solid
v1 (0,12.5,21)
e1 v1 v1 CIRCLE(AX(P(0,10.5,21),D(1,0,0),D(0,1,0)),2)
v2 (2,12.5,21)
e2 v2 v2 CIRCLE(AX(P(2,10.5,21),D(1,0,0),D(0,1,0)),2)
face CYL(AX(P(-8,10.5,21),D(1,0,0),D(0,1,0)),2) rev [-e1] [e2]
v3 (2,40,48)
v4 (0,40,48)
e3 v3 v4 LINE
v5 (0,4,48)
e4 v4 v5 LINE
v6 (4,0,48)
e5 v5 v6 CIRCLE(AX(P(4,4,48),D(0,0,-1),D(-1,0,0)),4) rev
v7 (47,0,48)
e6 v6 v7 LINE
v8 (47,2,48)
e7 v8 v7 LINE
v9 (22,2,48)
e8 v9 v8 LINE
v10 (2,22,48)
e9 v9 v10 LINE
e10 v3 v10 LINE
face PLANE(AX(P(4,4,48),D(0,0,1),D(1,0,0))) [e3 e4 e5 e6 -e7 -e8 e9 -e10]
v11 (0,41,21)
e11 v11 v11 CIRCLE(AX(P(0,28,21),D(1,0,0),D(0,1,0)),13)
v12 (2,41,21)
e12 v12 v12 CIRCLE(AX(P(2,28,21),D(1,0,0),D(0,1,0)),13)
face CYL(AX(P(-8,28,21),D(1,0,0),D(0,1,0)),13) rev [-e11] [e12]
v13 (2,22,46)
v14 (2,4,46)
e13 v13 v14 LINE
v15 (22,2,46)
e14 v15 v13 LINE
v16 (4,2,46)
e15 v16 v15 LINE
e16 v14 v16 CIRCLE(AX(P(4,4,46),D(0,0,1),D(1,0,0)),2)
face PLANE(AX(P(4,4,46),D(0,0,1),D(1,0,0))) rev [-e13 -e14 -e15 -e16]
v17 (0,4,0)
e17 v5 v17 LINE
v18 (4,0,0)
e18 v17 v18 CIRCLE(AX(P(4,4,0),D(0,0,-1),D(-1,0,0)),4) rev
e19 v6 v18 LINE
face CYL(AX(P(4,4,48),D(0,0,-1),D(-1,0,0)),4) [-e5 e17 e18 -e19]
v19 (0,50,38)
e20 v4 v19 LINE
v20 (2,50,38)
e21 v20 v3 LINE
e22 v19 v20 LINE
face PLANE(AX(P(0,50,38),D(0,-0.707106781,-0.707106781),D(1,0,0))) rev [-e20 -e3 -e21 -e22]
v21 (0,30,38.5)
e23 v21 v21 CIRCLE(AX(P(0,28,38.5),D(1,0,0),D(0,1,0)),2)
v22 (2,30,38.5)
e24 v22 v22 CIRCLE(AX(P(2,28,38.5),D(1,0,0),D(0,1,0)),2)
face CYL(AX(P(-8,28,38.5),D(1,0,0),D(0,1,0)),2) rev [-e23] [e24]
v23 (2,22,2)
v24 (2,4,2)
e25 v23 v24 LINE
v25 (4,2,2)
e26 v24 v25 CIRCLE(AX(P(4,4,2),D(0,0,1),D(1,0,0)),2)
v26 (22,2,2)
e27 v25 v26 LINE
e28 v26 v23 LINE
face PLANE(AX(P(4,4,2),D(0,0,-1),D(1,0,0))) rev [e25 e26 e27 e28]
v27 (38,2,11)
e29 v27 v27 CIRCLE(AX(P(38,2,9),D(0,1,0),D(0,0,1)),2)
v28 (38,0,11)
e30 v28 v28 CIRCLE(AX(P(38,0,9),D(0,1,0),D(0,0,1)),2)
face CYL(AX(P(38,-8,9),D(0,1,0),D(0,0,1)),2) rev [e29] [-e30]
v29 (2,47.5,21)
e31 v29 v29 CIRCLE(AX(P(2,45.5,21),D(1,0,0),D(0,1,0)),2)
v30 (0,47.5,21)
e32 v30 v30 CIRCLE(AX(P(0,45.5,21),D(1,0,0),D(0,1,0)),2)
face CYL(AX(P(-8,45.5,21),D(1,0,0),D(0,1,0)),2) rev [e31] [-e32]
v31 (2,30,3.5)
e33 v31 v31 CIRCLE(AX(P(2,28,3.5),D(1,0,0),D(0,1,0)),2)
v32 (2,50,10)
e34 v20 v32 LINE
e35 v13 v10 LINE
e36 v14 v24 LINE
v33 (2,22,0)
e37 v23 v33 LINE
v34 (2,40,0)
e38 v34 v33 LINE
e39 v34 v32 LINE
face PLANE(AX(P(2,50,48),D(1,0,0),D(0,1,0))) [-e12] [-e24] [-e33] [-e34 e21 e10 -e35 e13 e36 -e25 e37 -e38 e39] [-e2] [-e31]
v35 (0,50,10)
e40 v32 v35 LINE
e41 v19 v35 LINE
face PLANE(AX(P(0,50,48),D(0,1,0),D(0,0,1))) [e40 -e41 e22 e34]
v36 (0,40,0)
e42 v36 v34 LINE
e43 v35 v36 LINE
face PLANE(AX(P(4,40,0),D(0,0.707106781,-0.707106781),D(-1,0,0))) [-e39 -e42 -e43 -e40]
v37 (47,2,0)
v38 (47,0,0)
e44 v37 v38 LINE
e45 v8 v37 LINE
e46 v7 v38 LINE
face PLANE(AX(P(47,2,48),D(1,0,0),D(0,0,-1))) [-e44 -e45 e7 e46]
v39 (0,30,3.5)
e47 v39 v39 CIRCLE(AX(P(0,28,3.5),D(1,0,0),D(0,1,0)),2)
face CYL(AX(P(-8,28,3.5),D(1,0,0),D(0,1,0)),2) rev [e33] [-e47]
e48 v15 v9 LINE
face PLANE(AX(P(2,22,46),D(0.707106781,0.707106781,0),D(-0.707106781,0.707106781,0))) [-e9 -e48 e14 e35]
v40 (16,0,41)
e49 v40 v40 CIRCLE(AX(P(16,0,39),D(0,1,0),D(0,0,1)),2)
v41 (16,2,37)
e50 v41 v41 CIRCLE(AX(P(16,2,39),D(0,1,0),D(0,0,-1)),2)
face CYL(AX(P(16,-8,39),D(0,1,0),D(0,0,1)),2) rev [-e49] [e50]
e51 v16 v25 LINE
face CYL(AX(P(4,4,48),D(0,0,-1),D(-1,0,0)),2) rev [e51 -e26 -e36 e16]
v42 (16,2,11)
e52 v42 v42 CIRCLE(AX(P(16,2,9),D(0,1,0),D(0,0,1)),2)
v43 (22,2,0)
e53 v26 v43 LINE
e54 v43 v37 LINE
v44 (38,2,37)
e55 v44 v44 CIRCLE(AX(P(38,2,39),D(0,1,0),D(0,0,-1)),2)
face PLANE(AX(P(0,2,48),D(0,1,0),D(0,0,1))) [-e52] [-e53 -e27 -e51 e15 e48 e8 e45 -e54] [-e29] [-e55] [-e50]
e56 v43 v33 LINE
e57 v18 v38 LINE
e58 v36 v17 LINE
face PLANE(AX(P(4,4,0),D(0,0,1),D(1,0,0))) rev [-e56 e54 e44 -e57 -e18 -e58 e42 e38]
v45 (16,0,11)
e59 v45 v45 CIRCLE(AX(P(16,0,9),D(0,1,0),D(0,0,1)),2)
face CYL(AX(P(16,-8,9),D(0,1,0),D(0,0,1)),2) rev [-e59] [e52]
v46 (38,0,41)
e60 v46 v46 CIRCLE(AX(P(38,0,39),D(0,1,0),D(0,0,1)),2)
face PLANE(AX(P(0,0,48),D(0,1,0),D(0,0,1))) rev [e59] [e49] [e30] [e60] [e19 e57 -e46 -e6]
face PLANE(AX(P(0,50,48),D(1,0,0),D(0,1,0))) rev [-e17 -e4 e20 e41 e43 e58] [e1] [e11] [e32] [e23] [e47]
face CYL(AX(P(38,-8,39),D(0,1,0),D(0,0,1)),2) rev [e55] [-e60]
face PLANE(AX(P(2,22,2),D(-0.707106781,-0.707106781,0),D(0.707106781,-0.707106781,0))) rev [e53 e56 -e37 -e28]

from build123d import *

# Parameters (mm, degrees)
SM_BASE_FLANGE_1_DEPTH = 48
SKETCH_6_R             = 2
CUT_EXTRUDE_1_DEPTH    = 10
SKETCH_7_R             = 13
SKETCH_7_R_2           = 2
CUT_EXTRUDE_2_DEPTH    = 10
CHAMFER_1_SIZE         = 10
EXTRUDE_START          = -2
EXTRUDE_1_DEPTH        = 2


# Sheet-metal steps are written as plain solids
with BuildPart() as part:
    # Sketch 1 → 基体-法兰1 (new body)
    with BuildSketch(Plane.XY):
        with BuildLine():
            Line((0, 50), (0, 4))
            ThreePointArc((0, 4), (1.171572875, 1.171572875), (4, 0))
            Line((4, 0), (47, 0))
            Line((47, 0), (47, 2))
            Line((47, 2), (4, 2))
            ThreePointArc((4, 2), (2.585786438, 2.585786438), (2, 4))
            Line((2, 4), (2, 50))
            Line((2, 50), (0, 50))
        make_face()
    extrude(amount=SM_BASE_FLANGE_1_DEPTH)

    # 草图6 → 切除-拉伸1 (cut)
    with BuildSketch(Plane(origin=(0, 2, 0), x_dir=(1, 0, 0), z_dir=(0, 1, 0))):
        with Locations(Location((38, -9, 0), (0, 0, 270))):
            Circle(SKETCH_6_R)
        with Locations(Location((38, -39, 0), (0, 0, 270))):
            Circle(SKETCH_6_R)
        with Locations(Location((16, -9, 0), (0, 0, 270))):
            Circle(SKETCH_6_R)
        with Locations(Location((16, -39, 0), (0, 0, 270))):
            Circle(SKETCH_6_R)
    extrude(amount=-CUT_EXTRUDE_1_DEPTH, mode=Mode.SUBTRACT)

    # 草图7 → 切除-拉伸2 (cut)
    with BuildSketch(Plane(origin=(2, 0, 0), x_dir=(0, 0, -1), z_dir=(1, 0, 0))):
        with Locations(Location((-21, 28, 0), (0, 0, 90))):
            Circle(SKETCH_7_R)
        with Locations(Location((-21, 45.5, 0), (0, 0, 90))):
            Circle(SKETCH_7_R_2)
        with Locations(Location((-3.5, 28, 0), (0, 0, 90))):
            Circle(SKETCH_7_R_2)
        with Locations(Location((-21, 10.5, 0), (0, 0, 90))):
            Circle(SKETCH_7_R_2)
        with Locations(Location((-38.5, 28, 0), (0, 0, 90))):
            Circle(SKETCH_7_R_2)
    extrude(amount=-CUT_EXTRUDE_2_DEPTH, mode=Mode.SUBTRACT)

    # 倒角1
    chamfer_1_edges = [part.edges().sort_by_distance(p)[0] for p in [
        (1, 50, 48),
        (1, 50, 0),
    ]]
    chamfer(chamfer_1_edges, length=CHAMFER_1_SIZE)

    # 草图8 → 凸台-拉伸1 (add)
    with BuildSketch(Plane.XY.offset(48).offset(EXTRUDE_START)):
        with BuildLine():
            Line((2, 22), (22, 2))
            Line((22, 2), (4, 2))
            ThreePointArc((4, 2), (2.585786438, 2.585786438), (2, 4))
            Line((2, 4), (2, 22))
        make_face()
    extrude_1 = extrude(amount=EXTRUDE_1_DEPTH)

    # 镜向1: 凸台-拉伸1 across plane
    add(extrude_1.mirror(Plane.XY.offset(24)))


solid = part.part
